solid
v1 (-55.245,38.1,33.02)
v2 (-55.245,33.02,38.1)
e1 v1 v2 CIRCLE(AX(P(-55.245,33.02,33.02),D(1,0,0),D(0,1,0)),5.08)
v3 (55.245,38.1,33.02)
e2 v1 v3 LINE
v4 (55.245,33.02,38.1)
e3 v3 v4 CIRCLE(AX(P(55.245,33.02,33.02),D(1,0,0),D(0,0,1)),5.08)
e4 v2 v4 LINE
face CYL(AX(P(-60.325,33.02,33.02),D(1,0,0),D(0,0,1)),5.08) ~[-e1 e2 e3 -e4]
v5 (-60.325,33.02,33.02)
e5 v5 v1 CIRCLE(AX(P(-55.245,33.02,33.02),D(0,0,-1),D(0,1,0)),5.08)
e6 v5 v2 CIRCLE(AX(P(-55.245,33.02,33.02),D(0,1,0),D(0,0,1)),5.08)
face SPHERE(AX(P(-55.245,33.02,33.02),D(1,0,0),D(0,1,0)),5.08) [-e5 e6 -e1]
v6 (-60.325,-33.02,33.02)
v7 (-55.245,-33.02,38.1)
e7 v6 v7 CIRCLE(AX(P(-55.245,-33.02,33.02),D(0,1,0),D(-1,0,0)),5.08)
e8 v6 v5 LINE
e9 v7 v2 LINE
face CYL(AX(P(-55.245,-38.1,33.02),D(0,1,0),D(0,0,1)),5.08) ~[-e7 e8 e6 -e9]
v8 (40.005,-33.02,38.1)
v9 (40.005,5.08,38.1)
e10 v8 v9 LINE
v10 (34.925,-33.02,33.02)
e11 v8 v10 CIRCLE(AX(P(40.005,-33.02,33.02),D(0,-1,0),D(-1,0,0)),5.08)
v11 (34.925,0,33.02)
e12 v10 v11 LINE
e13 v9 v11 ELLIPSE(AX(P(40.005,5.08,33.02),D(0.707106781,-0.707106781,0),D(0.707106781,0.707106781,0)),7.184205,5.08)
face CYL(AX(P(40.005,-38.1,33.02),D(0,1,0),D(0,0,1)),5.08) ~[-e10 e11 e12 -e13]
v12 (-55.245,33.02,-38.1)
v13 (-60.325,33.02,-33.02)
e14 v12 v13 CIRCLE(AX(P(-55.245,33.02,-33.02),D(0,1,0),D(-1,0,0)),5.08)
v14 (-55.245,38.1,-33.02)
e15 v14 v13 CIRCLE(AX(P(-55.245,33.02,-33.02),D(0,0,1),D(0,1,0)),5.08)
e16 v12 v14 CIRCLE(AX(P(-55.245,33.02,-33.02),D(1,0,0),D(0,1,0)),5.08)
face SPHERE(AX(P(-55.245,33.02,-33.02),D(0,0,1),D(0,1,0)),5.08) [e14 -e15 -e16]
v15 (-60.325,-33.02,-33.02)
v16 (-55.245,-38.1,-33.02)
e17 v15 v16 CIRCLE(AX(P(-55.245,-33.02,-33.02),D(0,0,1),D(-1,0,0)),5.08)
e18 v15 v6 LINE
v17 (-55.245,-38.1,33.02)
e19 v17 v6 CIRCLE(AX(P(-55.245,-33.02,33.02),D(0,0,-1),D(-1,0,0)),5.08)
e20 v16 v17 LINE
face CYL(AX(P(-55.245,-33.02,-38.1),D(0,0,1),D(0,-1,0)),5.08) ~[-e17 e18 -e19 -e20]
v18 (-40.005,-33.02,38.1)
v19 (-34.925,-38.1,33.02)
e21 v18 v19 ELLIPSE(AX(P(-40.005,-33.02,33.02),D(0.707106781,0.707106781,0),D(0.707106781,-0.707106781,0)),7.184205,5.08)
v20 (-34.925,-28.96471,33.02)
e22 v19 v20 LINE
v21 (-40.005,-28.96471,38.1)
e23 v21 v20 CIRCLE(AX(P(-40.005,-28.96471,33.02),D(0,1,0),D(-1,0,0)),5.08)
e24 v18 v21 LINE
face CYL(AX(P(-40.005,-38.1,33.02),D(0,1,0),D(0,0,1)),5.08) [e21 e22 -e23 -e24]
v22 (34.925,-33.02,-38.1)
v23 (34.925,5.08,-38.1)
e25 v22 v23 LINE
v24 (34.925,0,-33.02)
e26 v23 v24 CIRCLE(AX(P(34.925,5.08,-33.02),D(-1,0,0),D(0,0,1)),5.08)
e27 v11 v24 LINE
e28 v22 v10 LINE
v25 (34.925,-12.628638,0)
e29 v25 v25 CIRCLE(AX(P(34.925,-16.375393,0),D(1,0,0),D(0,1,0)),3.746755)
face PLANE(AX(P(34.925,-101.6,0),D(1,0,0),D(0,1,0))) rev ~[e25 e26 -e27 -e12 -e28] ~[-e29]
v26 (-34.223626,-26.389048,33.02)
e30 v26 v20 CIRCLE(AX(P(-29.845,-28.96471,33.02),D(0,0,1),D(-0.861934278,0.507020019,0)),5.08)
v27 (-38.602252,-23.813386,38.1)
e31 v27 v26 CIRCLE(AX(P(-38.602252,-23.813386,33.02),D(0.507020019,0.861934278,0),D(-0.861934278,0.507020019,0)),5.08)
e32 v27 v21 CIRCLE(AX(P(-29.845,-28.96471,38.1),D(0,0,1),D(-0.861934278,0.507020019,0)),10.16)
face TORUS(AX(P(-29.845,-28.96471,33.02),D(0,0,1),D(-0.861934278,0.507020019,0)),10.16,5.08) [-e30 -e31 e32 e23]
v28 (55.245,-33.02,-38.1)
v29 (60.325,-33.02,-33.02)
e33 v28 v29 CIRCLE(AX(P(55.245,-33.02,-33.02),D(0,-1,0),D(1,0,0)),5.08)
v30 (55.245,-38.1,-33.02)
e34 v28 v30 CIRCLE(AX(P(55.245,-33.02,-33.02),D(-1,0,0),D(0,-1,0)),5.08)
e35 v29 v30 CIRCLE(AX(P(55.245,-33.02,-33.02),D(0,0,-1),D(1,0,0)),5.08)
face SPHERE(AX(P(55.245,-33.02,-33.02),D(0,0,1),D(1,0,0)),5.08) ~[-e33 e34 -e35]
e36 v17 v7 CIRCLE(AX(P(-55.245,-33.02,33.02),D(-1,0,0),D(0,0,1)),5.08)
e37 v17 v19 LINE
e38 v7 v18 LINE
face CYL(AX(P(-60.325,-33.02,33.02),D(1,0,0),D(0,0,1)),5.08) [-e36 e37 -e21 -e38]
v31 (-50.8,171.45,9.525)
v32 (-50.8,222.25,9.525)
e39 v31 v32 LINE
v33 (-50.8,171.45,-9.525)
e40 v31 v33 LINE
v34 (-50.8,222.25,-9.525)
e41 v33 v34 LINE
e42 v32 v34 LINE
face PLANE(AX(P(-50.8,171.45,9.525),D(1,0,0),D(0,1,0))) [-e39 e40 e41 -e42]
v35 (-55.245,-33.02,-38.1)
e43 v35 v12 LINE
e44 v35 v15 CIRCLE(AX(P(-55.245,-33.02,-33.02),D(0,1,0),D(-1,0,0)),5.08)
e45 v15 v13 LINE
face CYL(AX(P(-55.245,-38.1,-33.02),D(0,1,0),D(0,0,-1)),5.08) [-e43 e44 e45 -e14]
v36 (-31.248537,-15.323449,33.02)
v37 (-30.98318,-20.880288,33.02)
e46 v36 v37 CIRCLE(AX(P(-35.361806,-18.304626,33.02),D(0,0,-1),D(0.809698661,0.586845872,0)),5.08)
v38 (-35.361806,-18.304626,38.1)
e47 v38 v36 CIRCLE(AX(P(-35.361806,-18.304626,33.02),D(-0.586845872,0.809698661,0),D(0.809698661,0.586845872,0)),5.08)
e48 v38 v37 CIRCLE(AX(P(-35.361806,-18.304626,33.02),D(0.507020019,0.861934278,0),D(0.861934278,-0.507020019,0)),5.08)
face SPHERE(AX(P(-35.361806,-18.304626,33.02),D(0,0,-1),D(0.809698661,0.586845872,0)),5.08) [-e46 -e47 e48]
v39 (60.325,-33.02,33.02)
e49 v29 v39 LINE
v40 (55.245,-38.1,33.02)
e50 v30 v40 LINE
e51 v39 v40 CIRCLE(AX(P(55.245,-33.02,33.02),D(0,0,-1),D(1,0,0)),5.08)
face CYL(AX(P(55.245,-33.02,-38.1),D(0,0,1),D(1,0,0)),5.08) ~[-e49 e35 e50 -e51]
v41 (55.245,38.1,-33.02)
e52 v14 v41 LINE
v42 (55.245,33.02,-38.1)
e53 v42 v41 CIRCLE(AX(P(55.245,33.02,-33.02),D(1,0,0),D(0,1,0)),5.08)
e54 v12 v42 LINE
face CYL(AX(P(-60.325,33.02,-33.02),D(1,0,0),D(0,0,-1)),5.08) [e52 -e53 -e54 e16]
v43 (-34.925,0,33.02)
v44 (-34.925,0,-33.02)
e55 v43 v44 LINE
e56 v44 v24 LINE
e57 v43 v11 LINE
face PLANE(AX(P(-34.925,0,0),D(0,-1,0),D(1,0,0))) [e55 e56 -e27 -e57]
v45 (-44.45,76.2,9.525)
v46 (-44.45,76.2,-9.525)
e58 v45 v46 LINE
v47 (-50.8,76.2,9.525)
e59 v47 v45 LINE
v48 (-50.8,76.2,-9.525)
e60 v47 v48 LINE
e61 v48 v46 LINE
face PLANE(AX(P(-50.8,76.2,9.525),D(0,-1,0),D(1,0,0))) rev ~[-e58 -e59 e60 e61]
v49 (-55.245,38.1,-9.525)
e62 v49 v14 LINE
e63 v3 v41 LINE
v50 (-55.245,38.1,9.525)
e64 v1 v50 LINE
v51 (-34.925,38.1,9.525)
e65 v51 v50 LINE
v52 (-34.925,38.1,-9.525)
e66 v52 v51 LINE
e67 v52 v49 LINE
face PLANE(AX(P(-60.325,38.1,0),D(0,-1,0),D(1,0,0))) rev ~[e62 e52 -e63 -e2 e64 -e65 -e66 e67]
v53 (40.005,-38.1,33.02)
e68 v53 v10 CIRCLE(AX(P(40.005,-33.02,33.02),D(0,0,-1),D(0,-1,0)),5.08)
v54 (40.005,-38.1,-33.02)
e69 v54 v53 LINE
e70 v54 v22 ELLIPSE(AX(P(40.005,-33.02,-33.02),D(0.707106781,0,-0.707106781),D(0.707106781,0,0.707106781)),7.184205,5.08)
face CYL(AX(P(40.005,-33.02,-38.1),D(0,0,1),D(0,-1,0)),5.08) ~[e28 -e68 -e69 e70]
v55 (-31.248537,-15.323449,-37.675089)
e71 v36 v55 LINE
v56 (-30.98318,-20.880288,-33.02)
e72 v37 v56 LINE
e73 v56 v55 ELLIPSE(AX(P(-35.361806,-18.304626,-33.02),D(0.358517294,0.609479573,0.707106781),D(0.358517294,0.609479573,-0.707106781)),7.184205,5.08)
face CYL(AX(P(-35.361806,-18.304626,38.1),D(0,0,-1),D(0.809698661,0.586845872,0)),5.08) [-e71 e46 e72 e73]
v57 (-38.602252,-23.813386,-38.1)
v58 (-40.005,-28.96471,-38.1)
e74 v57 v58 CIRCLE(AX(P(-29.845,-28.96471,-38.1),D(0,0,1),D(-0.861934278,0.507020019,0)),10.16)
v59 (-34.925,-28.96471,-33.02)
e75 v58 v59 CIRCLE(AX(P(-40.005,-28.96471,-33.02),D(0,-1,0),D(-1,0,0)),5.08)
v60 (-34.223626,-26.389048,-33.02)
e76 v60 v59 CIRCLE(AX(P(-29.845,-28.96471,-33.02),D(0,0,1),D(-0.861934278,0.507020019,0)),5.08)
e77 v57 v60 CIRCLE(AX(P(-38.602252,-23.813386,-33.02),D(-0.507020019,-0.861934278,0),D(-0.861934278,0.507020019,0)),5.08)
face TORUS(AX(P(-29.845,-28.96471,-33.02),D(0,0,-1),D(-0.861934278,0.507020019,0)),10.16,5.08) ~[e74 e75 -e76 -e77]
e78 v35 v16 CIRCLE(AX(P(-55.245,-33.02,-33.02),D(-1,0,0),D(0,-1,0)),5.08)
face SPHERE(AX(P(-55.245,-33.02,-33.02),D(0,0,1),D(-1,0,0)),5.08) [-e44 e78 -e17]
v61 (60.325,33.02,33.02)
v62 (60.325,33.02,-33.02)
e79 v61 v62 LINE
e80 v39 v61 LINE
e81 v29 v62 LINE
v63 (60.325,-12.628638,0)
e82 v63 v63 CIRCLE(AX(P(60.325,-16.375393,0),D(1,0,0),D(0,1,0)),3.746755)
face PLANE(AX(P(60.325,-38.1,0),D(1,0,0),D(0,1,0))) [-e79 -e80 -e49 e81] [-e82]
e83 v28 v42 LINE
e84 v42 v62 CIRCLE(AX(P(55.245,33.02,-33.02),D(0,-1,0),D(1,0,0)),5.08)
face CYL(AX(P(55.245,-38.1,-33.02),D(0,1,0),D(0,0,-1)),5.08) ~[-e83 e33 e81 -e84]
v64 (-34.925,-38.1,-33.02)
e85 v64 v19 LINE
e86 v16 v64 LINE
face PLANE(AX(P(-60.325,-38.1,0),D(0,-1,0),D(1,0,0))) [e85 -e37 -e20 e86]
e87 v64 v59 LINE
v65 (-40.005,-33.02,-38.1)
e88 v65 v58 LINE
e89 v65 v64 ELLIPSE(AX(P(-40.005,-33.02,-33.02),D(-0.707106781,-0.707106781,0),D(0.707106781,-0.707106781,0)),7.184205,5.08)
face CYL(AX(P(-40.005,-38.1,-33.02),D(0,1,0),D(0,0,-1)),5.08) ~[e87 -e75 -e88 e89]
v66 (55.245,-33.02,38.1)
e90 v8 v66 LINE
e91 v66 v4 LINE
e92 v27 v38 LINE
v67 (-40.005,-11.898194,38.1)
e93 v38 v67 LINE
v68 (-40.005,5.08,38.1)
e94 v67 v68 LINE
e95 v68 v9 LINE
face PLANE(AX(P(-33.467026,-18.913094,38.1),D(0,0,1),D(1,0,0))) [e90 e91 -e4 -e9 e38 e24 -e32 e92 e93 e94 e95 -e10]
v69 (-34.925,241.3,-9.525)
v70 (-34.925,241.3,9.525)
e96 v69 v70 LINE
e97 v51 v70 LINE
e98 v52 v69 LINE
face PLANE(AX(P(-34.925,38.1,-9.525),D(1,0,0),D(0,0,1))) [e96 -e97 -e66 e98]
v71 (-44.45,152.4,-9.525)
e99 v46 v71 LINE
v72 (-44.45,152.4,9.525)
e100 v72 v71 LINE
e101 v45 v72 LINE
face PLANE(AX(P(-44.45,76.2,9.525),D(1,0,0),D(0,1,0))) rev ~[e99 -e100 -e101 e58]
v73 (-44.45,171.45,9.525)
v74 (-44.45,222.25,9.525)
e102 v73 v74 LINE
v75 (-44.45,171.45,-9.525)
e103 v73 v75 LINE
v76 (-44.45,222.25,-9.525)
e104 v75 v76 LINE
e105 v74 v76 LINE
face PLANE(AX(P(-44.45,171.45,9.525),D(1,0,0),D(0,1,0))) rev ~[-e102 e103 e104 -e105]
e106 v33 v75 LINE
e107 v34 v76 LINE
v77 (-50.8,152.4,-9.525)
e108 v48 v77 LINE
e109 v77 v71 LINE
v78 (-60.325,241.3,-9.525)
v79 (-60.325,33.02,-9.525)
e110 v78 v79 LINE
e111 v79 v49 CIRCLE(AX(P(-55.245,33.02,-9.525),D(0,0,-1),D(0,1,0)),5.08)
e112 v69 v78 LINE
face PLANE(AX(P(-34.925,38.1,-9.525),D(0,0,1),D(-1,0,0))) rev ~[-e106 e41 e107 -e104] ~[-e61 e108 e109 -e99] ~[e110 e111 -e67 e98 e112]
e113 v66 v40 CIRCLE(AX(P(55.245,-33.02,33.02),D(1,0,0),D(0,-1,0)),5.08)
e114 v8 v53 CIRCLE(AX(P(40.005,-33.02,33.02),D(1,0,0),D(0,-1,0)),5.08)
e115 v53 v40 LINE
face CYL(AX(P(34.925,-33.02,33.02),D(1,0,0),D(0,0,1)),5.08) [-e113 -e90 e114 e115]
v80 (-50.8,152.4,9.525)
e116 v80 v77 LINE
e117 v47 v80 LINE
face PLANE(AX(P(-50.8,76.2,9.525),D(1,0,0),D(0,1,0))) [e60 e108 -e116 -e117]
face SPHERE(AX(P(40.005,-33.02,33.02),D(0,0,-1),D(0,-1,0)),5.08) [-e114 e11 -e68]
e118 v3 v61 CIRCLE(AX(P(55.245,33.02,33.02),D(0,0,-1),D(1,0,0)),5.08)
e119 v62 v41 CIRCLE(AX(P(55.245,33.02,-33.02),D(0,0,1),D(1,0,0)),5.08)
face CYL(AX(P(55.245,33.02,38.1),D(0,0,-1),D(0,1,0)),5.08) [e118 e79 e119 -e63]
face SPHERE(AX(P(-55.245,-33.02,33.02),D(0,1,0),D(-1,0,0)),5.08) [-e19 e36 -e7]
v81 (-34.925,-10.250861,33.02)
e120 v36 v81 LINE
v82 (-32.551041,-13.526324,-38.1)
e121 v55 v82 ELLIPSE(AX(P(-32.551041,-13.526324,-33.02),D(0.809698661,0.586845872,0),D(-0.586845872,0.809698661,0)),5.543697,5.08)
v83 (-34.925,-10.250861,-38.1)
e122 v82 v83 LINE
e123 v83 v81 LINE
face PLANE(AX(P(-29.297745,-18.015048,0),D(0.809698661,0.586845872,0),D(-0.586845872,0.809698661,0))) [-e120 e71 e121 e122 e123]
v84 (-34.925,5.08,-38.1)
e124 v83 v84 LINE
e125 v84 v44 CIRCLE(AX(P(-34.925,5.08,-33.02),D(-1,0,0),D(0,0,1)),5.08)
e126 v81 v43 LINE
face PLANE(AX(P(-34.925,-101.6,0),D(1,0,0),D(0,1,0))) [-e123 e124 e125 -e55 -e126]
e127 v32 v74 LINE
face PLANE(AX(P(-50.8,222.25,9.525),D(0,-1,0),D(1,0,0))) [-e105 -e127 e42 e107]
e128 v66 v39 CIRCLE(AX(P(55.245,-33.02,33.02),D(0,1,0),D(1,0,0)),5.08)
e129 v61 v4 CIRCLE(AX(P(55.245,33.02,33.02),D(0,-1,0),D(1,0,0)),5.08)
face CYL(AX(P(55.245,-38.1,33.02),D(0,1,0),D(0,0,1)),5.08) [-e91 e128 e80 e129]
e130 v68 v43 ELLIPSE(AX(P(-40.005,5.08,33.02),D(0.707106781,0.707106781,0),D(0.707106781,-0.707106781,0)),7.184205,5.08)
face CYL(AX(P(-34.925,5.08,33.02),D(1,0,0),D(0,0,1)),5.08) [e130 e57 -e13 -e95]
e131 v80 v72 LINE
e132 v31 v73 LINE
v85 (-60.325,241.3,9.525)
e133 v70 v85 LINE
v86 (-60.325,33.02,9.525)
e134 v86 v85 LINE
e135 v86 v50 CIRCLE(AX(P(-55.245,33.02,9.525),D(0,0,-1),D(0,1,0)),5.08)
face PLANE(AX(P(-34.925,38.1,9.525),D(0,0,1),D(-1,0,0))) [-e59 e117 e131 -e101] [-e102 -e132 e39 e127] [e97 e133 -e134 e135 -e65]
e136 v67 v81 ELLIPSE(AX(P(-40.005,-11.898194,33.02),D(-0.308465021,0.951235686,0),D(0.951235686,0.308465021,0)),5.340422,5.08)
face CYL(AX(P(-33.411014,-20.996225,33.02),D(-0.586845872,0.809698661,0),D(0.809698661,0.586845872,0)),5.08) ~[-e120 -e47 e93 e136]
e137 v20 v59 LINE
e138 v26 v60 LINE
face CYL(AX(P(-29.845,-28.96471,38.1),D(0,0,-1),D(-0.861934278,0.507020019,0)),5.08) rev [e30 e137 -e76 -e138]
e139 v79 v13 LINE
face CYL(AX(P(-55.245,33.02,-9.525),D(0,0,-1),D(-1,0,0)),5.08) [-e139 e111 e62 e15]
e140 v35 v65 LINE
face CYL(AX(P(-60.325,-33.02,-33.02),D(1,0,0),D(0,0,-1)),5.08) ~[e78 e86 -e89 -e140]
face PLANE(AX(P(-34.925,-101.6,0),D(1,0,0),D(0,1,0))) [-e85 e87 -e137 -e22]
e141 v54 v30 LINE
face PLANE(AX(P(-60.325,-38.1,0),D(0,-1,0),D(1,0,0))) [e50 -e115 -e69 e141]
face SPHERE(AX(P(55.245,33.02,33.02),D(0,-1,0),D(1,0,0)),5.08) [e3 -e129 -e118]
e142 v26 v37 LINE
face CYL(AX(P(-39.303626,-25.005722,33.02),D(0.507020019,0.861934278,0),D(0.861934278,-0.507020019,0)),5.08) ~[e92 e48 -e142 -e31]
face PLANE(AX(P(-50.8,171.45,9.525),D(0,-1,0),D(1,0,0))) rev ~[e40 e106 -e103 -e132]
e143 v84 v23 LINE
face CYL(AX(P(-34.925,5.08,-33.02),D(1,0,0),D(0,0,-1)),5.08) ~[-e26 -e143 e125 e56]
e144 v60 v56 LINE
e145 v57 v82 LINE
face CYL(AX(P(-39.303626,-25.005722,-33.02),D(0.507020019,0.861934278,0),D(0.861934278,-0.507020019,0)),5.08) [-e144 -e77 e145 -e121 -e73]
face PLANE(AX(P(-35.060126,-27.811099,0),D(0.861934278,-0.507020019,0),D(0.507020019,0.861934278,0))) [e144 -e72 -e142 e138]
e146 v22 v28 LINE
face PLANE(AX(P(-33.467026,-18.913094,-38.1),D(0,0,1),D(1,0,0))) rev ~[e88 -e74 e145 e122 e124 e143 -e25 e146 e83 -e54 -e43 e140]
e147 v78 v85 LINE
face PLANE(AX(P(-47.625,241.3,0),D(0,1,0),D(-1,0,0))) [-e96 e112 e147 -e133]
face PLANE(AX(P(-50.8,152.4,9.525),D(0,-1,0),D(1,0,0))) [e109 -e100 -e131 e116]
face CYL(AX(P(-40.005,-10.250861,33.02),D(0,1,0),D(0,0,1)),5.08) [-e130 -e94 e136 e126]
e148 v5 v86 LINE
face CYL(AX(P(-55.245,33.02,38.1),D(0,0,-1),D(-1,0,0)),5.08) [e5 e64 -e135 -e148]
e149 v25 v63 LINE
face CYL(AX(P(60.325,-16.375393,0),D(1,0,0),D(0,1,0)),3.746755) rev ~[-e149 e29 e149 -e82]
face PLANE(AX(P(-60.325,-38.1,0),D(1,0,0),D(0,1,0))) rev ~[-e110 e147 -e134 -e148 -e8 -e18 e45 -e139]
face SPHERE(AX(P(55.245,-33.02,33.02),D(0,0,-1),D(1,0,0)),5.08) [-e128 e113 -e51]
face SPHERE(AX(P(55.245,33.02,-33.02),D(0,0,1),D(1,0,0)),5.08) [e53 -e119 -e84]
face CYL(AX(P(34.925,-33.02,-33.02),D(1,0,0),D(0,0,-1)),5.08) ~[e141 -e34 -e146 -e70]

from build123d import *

# Parameters (mm, degrees)
F0_W      = 120.65
F0_H      = 76.2
F2_DEPTH  = 38.1
F1_W      = 69.85
F1_H      = 101.6
F3_DEPTH  = 38.1
F4_R      = 3.7467551061
F5_DEPTH  = 38.1
F6_W      = 25.4
F6_H      = 19.05
F7_DEPTH  = 203.2
F8_W      = 6.35
F8_H      = 50.8
F8_H_2    = 76.2
F9_DEPTH  = 47.626
F11_DEPTH = 38.1
F12_R     = 5.08


with BuildPart() as f2:
    # F0 (on Top) → F2 (new body, symmetric)
    with BuildSketch(Plane.XY):
        Rectangle(F0_W, F0_H)
    extrude(amount=F2_DEPTH, both=True)

    # F1 (on face) → F3 (cut, symmetric)
    with BuildSketch(Plane.XY):
        with Locations((0, -50.8)):
            Rectangle(F1_W, F1_H)
    extrude(amount=F3_DEPTH, both=True, mode=Mode.SUBTRACT)

    # F4 (on face) → F5 (cut, symmetric)
    with BuildSketch(Plane.YZ.offset(60.325)):
        with Locations((-16.3753926754, 0)):
            Circle(F4_R)
    extrude(amount=F5_DEPTH, both=True, mode=Mode.SUBTRACT)

    # F6 (on face) → F7 (join)
    with BuildSketch(Plane(origin=(0, 38.1, 0), x_dir=(-1, 0, 0), z_dir=(0, 1, 0))):
        with Locations((47.625, 0)):
            Rectangle(F6_W, F6_H)
    extrude(amount=F7_DEPTH)

    # F8 (on face) → F9 (cut, through all)
    with BuildSketch(Plane.XY.offset(9.525)):
        with Locations((-47.625, 196.85)):
            Rectangle(F8_W, F8_H)
        with Locations((-47.625, 114.3)):
            Rectangle(F8_W, F8_H_2)
    extrude(amount=-F9_DEPTH, mode=Mode.SUBTRACT)

    # F10 (on Top) → F11 (join, symmetric)
    with BuildSketch(Plane.XY):
        Polygon((-29.2977448553, -18.0150475353), (-34.9880978465, -10.1638017222), (-35.0601263344, -27.8110988438), align=None)
    extrude(amount=F11_DEPTH, both=True)

    # F12
    f12_edges = [f2.edges().sort_by_distance(p)[0] for p in [
        (60.325, -38.1, 0),
        (60.325, 0, 38.1),
        (60.325, 38.1, 0),
        (60.325, 0, -38.1),
        (0, 38.1, 38.1),
        (-60.325, 38.1, 23.8125),
        (-60.325, 38.1, -23.8125),
        (0, 38.1, -38.1),
        (-60.325, 0, 38.1),
        (-60.325, -38.1, 0),
        (-60.325, 0, -38.1),
        (34.925, -38.1, 0),
        (-34.925, -27.581384, 0),
        (-32.111372, -22.798216, 38.1),
        (-29.297745, -18.015048, 0),
        (-32.111372, -22.798216, -38.1),
        (0, 0, 38.1),
        (0, 0, -38.1),
        (47.625, -38.1, 38.1),
        (47.625, -38.1, -38.1),
        (-47.625, -38.1, 38.1),
        (-47.625, -38.1, -38.1),
        (-34.925, -5.12543, 38.1),
        (-32.111372, -14.132954, 38.1),
        (-34.925, -32.840692, 38.1),
        (34.925, -19.05, 38.1),
        (-34.925, -32.840692, -38.1),
    ]]
    fillet(f12_edges, radius=F12_R)


solid = f2.part
